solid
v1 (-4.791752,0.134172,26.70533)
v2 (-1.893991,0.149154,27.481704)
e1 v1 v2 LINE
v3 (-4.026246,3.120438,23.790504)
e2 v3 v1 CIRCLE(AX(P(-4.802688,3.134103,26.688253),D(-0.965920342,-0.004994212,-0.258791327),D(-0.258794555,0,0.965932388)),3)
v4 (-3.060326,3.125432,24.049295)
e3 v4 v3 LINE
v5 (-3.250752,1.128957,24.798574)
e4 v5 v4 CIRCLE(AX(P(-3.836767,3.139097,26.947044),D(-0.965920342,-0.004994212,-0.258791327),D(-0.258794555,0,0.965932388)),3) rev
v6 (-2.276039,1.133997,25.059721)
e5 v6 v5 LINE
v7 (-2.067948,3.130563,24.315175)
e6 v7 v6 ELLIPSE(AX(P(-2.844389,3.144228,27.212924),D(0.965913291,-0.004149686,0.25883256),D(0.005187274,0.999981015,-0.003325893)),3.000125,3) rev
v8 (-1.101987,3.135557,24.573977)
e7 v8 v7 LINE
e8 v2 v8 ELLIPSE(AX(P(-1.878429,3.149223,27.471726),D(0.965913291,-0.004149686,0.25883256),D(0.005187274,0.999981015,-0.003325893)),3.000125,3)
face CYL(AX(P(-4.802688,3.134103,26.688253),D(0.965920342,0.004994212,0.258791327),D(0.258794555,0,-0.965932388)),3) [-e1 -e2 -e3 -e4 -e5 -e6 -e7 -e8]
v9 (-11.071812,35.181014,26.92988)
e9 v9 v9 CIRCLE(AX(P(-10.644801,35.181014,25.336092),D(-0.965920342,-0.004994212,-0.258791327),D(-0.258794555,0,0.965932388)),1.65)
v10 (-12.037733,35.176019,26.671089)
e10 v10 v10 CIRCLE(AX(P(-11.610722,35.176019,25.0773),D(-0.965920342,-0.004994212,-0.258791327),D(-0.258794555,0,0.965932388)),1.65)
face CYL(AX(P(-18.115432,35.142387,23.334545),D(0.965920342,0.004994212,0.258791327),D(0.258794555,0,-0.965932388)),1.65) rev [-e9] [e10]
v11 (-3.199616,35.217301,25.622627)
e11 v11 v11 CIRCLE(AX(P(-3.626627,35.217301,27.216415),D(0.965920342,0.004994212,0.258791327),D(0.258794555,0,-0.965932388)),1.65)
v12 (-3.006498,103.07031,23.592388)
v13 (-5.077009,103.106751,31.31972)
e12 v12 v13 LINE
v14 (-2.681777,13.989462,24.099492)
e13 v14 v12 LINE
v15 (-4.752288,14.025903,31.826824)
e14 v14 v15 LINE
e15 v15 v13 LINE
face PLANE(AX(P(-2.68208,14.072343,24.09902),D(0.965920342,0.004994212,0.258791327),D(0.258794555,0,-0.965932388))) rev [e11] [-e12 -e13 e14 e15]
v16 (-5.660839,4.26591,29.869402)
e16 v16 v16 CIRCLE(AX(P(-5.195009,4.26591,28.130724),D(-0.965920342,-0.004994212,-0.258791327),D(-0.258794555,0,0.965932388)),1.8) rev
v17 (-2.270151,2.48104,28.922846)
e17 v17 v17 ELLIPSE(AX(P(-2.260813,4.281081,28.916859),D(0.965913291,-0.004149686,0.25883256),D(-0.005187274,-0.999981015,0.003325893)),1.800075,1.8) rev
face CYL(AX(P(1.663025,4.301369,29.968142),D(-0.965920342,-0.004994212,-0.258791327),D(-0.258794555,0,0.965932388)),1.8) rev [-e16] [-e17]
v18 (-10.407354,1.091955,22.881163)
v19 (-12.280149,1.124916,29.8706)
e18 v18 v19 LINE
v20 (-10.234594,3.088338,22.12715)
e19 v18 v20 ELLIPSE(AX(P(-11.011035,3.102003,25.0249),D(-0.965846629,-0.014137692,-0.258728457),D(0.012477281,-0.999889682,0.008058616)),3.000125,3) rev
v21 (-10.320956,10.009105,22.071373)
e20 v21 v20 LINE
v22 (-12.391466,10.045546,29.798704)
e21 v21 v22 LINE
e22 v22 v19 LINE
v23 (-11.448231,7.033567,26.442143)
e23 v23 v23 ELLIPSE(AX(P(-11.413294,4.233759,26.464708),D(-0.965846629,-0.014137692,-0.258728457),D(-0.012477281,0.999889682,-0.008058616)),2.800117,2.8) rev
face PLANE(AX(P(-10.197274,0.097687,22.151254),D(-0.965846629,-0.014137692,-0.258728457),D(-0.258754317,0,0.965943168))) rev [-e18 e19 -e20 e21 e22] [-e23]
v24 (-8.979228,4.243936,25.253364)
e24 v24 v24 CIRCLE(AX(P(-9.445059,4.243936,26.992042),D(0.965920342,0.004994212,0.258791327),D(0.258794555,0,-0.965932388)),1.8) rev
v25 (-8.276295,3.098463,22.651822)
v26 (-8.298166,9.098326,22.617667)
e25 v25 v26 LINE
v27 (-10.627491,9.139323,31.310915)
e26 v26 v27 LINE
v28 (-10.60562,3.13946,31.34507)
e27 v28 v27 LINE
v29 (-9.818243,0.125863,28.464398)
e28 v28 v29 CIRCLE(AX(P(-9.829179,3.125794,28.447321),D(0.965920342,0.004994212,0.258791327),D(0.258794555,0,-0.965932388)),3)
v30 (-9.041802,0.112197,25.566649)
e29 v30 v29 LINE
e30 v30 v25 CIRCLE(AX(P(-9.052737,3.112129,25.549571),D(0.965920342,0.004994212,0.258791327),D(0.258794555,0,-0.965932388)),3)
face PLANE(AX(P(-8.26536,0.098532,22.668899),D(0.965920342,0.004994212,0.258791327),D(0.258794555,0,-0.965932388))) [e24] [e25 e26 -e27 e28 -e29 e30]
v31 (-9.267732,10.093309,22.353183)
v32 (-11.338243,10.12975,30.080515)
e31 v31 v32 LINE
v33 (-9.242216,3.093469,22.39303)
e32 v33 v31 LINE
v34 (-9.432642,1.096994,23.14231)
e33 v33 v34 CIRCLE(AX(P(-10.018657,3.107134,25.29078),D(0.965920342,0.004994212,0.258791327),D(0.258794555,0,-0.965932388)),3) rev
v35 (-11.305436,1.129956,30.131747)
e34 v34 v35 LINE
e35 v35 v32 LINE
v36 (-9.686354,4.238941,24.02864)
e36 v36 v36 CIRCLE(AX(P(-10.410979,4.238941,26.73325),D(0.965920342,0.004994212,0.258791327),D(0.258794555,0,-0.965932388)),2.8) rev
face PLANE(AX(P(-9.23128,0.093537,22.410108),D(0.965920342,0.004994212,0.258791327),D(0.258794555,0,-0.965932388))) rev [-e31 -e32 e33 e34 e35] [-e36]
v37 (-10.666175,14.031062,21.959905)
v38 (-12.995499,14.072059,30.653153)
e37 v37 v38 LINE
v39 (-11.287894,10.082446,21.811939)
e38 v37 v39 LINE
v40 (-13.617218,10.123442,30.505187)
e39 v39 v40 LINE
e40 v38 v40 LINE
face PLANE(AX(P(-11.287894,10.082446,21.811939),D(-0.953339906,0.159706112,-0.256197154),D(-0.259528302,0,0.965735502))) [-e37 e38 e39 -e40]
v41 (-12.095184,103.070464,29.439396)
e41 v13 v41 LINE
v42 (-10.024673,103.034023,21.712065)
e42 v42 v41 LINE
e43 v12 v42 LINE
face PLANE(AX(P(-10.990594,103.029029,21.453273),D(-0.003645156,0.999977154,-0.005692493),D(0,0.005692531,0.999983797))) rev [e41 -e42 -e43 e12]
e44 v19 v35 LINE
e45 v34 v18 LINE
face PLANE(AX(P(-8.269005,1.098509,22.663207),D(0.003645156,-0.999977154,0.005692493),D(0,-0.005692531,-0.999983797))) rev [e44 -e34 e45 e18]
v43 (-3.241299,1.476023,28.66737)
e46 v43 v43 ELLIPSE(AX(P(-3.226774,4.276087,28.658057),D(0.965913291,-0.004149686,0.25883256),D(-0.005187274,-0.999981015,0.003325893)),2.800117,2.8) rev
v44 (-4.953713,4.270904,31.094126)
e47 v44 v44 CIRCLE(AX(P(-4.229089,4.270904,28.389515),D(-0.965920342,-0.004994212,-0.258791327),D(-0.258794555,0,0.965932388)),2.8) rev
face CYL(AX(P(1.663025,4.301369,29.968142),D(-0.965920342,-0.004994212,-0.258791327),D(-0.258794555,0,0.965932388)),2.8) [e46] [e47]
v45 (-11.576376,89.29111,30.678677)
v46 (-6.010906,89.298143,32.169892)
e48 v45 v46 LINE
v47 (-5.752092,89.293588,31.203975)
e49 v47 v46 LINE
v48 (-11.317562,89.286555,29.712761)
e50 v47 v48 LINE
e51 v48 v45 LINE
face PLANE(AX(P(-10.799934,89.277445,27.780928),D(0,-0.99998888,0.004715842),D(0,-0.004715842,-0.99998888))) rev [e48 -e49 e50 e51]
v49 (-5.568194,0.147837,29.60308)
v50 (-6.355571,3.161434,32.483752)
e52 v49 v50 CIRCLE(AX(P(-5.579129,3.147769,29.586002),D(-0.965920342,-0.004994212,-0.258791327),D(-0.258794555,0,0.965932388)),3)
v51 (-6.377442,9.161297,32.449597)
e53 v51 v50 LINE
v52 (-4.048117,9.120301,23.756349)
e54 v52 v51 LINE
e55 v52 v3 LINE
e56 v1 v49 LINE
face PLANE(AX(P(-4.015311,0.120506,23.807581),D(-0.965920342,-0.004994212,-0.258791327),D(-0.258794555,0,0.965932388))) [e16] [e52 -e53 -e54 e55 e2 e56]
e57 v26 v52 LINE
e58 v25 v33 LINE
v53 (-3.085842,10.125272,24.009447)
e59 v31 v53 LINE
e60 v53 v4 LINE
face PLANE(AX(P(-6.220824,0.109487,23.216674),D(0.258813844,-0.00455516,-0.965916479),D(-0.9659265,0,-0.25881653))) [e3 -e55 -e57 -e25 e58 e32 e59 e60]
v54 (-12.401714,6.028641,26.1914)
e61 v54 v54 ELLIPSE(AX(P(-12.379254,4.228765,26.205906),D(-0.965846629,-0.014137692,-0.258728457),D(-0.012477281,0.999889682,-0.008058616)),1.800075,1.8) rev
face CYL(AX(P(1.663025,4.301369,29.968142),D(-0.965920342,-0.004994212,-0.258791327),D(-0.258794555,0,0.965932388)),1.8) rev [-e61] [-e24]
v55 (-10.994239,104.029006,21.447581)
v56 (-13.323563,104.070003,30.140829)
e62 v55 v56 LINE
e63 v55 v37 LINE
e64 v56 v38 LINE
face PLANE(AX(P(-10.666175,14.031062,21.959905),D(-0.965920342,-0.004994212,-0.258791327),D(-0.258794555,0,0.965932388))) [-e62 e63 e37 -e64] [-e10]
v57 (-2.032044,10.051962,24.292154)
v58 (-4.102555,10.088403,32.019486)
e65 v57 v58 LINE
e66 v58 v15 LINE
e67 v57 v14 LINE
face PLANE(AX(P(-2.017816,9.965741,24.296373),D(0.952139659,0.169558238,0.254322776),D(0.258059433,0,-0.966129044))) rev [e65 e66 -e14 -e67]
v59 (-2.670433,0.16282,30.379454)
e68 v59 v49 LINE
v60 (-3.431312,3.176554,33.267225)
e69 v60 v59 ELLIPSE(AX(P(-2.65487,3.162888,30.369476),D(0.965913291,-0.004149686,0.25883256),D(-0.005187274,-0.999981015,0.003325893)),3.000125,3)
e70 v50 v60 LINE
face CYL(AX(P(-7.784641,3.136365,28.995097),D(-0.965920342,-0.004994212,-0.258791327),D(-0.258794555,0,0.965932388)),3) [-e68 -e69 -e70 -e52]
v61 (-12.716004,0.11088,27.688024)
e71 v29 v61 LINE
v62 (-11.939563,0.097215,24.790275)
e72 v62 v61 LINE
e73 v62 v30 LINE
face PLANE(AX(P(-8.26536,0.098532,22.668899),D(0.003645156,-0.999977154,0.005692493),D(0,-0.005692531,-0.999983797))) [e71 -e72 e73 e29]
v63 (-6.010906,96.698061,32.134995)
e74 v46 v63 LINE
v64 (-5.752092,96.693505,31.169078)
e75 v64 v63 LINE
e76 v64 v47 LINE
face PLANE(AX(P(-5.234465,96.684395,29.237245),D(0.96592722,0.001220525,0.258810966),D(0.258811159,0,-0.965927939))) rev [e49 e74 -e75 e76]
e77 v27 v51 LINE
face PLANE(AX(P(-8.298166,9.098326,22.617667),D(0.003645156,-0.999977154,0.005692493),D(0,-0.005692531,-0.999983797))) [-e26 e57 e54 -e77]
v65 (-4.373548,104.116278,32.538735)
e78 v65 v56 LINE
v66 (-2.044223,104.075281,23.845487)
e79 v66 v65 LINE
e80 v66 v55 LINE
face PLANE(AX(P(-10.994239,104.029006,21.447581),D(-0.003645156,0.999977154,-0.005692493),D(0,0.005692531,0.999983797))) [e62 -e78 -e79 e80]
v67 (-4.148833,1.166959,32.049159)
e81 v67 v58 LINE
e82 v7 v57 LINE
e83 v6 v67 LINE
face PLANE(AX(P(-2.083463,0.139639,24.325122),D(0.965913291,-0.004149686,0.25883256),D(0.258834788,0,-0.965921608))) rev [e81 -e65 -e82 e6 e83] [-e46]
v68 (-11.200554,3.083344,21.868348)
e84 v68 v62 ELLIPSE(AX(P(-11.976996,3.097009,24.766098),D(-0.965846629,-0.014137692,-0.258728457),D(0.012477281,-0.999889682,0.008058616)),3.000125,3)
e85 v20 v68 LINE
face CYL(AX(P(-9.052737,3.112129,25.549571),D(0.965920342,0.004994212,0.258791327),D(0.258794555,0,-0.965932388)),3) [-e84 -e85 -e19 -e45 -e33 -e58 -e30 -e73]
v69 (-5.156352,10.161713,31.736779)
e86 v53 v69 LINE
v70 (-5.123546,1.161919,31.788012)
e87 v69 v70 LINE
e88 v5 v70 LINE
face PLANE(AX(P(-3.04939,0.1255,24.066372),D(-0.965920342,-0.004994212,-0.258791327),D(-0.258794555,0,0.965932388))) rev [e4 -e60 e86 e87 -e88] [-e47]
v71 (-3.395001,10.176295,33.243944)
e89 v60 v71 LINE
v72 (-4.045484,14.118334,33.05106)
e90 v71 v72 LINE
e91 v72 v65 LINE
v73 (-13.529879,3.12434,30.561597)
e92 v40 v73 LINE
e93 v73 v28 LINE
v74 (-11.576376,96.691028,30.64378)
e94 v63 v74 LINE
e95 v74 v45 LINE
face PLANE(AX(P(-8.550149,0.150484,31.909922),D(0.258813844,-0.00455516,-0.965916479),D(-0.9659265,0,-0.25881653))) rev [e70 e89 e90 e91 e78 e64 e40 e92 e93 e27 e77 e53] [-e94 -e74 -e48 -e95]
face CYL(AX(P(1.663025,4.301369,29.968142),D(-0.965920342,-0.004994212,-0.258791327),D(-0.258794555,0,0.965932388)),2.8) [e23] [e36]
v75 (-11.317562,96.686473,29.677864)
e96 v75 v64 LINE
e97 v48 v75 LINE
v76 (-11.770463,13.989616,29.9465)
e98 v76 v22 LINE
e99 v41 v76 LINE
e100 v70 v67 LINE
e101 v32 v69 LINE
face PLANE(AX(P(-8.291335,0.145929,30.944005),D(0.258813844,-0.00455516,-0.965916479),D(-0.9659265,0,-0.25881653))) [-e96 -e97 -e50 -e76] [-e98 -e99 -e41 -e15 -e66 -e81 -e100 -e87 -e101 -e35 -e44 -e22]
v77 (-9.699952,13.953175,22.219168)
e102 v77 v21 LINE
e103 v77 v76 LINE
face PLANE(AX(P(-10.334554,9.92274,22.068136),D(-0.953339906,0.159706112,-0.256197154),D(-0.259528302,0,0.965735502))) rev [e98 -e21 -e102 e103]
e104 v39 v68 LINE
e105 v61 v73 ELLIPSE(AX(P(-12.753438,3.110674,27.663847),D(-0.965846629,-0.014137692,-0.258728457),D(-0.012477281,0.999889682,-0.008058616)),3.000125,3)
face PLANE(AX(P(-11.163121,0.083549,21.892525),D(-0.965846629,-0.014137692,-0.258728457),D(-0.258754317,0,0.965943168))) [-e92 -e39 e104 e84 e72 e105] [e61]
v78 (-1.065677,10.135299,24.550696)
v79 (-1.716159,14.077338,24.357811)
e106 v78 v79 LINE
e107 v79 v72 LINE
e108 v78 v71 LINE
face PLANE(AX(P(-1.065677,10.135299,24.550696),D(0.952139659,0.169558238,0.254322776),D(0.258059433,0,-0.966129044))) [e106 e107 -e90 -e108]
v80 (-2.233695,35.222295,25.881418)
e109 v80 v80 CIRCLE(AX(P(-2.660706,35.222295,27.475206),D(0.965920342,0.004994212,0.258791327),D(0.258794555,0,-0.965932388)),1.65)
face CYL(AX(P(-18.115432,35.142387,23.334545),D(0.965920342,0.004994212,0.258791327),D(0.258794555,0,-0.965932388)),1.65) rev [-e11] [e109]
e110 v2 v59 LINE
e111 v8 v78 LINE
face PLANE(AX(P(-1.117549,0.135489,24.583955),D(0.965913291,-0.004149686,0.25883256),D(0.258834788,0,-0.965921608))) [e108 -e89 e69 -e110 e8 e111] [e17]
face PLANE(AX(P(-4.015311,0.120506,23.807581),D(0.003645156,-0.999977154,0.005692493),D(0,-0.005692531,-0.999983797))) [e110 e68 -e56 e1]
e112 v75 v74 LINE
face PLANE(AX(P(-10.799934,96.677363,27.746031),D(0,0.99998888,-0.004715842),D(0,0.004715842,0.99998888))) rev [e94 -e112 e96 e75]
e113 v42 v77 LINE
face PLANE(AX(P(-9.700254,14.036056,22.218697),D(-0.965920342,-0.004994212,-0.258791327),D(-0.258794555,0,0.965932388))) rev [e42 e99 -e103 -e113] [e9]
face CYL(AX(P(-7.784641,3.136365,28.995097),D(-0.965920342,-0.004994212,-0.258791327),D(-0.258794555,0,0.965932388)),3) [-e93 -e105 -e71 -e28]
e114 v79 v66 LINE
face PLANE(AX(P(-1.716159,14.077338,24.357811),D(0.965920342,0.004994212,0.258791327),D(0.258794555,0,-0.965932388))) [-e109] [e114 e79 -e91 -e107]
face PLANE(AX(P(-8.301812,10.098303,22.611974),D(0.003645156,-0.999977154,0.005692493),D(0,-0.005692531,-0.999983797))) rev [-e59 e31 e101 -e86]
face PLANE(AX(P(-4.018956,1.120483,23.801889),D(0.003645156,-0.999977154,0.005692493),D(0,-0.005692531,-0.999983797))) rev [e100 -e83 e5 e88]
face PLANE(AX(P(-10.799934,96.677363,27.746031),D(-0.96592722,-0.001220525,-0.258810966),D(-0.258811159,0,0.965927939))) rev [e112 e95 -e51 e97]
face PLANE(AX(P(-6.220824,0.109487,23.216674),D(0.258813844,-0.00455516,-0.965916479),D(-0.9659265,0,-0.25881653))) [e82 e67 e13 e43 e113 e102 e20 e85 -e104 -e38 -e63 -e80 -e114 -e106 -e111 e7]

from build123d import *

# Parameters (mm, degrees)
BOSS_EXTRUDE1_DEPTH = 9
SKETCH2_R           = 1.8
CUT_EXTRUDE1_DEPTH  = 11.5
SHELL1_T            = -1
FILLET3_R           = 3
SKETCH5_R           = 1.65
CUT_EXTRUDE4_DEPTH  = 16
SKETCH6_W           = 5.761789727
SKETCH6_H           = 7.4
CUT_EXTRUDE5_DEPTH  = 3


with BuildPart() as part:
    # Sketch1 → Boss-Extrude1 (new body)
    with BuildSketch(Plane(origin=(-8.550148724, 0.150483818, 31.909921865), x_dir=(0.9659203418587706, 0.0049942121419566075, 0.2587913271895271), z_dir=(-0.2588138443395903, 0.004555159989206847, 0.96591647904756))):
        Polygon((-2.116672777, -0.00038458), (-5.116672777, -0.00038458), (-5.208111757, 9.999197357), (-4.549568011, 13.944614969), (-4.549568011, 103.944614969), (4.716222456, 103.944614969), (4.716222456, 13.944614969), (5.374766202, 9.999197357), (5.283327223, -0.00038458), (2.283327223, -0.00038458), (2.283327223, 8.99961542), (-2.116672777, 8.99961542), align=None)
    extrude(amount=-BOSS_EXTRUDE1_DEPTH)

    # Sketch2 → Cut-Extrude1 (cut, symmetric)
    with BuildSketch(Plane(origin=(-2.044537293, -0.010571113, -0.547776557), x_dir=(0.2588168701543083, -0.005411250453060186, -0.9659112516644903), z_dir=(0.9659203418587706, 0.0049942121419806335, 0.2587913271895269))):
        with Locations(Location((-28.539422387, 4.100183989, 0), (0, 0, 180.310047193))):
            Circle(SKETCH2_R)
    extrude(amount=CUT_EXTRUDE1_DEPTH, both=True, mode=Mode.SUBTRACT)

    # Shell1
    shell1_openings = [part.faces().sort_by_distance(p)[0] for p in [
        (-6.334444908, 53.359699464, 22.935106903),
    ]]
    offset(amount=SHELL1_T, openings=shell1_openings, kind=Kind.INTERSECTION)

    # Fillet3
    # the kernel refuses this fillet: 3 mm, written as the material it takes off along each edge
    with BuildSketch(Plane(origin=(-3.35028205, 0.176984725, 33.303082451), x_dir=(0.2588138443395903, -0.004555159989206649, -0.9659164790475598), z_dir=(-0.9659203418587717, -0.004994212141671299, -0.25879132718952874))) as fillet3_piece_1:
        with BuildLine():
            CenterArc((FILLET3_R, -FILLET3_R), FILLET3_R, 90, 90)
            Line((0, -FILLET3_R), (0, 0))
            Line((0, 0), (FILLET3_R, 0))
        make_face()
    extrude(amount=18, mode=Mode.SUBTRACT)
    with BuildSketch(Plane(origin=(-1.020957451, 0.135988285, 24.609834139), x_dir=(-0.25881384433959026, 0.004555159989206952, 0.9659164790475598), z_dir=(-0.9659203418587717, -0.004994212141671299, -0.25879132718952874)), Plane(origin=(6.126853079, 0.172945455, 26.52488996), x_dir=(-0.25881384433959026, 0.004555159989206913, 0.9659164790475598), z_dir=(-0.9659203418587694, -0.004994212142289673, -0.2587913271895252)), Plane(origin=(3.797528479, 0.213941895, 35.218138272), x_dir=(-0.0036451559089296618, 0.9999771539203036, -0.005692492937989095), z_dir=(-0.9659203418587694, -0.004994212142289673, -0.2587913271895252))) as fillet3_piece_2:
        with BuildLine():
            CenterArc((FILLET3_R, FILLET3_R), FILLET3_R, 180, 90)
            Line((0, FILLET3_R), (0, 0))
            Line((0, 0), (FILLET3_R, 0))
        make_face()
    extrude(amount=18, mode=Mode.SUBTRACT)

    # Sketch5 → Cut-Extrude4 (cut)
    with BuildSketch(Plane(origin=(4.555495207, 0.023553815, 1.220517469), x_dir=(0.2587878680955358, 0.0013380415103731802, -0.9659332528552292), z_dir=(0.9659203418587695, 0.0049942121422931664, 0.25879132718952524))):
        with Locations(Location((-27.180645186, 35.235580785, 0), (0, 0, 359.92333489))):
            Circle(SKETCH5_R)
    extrude(amount=-CUT_EXTRUDE4_DEPTH, mode=Mode.SUBTRACT)

    # Sketch6 → Cut-Extrude5 (cut)
    with BuildSketch(Plane(origin=(-8.550148724, 0.150483818, 31.909921865), x_dir=(0.9659272198142892, 0.0012205251536603987, 0.25881096642180224), z_dir=(-0.2588138443395908, 0.0045551599892071715, 0.9659164790475597))):
        with Locations((-0.252081359, 92.845441705)):
            Rectangle(SKETCH6_W, SKETCH6_H)
    extrude(amount=-CUT_EXTRUDE5_DEPTH, mode=Mode.SUBTRACT)


solid = part.part
